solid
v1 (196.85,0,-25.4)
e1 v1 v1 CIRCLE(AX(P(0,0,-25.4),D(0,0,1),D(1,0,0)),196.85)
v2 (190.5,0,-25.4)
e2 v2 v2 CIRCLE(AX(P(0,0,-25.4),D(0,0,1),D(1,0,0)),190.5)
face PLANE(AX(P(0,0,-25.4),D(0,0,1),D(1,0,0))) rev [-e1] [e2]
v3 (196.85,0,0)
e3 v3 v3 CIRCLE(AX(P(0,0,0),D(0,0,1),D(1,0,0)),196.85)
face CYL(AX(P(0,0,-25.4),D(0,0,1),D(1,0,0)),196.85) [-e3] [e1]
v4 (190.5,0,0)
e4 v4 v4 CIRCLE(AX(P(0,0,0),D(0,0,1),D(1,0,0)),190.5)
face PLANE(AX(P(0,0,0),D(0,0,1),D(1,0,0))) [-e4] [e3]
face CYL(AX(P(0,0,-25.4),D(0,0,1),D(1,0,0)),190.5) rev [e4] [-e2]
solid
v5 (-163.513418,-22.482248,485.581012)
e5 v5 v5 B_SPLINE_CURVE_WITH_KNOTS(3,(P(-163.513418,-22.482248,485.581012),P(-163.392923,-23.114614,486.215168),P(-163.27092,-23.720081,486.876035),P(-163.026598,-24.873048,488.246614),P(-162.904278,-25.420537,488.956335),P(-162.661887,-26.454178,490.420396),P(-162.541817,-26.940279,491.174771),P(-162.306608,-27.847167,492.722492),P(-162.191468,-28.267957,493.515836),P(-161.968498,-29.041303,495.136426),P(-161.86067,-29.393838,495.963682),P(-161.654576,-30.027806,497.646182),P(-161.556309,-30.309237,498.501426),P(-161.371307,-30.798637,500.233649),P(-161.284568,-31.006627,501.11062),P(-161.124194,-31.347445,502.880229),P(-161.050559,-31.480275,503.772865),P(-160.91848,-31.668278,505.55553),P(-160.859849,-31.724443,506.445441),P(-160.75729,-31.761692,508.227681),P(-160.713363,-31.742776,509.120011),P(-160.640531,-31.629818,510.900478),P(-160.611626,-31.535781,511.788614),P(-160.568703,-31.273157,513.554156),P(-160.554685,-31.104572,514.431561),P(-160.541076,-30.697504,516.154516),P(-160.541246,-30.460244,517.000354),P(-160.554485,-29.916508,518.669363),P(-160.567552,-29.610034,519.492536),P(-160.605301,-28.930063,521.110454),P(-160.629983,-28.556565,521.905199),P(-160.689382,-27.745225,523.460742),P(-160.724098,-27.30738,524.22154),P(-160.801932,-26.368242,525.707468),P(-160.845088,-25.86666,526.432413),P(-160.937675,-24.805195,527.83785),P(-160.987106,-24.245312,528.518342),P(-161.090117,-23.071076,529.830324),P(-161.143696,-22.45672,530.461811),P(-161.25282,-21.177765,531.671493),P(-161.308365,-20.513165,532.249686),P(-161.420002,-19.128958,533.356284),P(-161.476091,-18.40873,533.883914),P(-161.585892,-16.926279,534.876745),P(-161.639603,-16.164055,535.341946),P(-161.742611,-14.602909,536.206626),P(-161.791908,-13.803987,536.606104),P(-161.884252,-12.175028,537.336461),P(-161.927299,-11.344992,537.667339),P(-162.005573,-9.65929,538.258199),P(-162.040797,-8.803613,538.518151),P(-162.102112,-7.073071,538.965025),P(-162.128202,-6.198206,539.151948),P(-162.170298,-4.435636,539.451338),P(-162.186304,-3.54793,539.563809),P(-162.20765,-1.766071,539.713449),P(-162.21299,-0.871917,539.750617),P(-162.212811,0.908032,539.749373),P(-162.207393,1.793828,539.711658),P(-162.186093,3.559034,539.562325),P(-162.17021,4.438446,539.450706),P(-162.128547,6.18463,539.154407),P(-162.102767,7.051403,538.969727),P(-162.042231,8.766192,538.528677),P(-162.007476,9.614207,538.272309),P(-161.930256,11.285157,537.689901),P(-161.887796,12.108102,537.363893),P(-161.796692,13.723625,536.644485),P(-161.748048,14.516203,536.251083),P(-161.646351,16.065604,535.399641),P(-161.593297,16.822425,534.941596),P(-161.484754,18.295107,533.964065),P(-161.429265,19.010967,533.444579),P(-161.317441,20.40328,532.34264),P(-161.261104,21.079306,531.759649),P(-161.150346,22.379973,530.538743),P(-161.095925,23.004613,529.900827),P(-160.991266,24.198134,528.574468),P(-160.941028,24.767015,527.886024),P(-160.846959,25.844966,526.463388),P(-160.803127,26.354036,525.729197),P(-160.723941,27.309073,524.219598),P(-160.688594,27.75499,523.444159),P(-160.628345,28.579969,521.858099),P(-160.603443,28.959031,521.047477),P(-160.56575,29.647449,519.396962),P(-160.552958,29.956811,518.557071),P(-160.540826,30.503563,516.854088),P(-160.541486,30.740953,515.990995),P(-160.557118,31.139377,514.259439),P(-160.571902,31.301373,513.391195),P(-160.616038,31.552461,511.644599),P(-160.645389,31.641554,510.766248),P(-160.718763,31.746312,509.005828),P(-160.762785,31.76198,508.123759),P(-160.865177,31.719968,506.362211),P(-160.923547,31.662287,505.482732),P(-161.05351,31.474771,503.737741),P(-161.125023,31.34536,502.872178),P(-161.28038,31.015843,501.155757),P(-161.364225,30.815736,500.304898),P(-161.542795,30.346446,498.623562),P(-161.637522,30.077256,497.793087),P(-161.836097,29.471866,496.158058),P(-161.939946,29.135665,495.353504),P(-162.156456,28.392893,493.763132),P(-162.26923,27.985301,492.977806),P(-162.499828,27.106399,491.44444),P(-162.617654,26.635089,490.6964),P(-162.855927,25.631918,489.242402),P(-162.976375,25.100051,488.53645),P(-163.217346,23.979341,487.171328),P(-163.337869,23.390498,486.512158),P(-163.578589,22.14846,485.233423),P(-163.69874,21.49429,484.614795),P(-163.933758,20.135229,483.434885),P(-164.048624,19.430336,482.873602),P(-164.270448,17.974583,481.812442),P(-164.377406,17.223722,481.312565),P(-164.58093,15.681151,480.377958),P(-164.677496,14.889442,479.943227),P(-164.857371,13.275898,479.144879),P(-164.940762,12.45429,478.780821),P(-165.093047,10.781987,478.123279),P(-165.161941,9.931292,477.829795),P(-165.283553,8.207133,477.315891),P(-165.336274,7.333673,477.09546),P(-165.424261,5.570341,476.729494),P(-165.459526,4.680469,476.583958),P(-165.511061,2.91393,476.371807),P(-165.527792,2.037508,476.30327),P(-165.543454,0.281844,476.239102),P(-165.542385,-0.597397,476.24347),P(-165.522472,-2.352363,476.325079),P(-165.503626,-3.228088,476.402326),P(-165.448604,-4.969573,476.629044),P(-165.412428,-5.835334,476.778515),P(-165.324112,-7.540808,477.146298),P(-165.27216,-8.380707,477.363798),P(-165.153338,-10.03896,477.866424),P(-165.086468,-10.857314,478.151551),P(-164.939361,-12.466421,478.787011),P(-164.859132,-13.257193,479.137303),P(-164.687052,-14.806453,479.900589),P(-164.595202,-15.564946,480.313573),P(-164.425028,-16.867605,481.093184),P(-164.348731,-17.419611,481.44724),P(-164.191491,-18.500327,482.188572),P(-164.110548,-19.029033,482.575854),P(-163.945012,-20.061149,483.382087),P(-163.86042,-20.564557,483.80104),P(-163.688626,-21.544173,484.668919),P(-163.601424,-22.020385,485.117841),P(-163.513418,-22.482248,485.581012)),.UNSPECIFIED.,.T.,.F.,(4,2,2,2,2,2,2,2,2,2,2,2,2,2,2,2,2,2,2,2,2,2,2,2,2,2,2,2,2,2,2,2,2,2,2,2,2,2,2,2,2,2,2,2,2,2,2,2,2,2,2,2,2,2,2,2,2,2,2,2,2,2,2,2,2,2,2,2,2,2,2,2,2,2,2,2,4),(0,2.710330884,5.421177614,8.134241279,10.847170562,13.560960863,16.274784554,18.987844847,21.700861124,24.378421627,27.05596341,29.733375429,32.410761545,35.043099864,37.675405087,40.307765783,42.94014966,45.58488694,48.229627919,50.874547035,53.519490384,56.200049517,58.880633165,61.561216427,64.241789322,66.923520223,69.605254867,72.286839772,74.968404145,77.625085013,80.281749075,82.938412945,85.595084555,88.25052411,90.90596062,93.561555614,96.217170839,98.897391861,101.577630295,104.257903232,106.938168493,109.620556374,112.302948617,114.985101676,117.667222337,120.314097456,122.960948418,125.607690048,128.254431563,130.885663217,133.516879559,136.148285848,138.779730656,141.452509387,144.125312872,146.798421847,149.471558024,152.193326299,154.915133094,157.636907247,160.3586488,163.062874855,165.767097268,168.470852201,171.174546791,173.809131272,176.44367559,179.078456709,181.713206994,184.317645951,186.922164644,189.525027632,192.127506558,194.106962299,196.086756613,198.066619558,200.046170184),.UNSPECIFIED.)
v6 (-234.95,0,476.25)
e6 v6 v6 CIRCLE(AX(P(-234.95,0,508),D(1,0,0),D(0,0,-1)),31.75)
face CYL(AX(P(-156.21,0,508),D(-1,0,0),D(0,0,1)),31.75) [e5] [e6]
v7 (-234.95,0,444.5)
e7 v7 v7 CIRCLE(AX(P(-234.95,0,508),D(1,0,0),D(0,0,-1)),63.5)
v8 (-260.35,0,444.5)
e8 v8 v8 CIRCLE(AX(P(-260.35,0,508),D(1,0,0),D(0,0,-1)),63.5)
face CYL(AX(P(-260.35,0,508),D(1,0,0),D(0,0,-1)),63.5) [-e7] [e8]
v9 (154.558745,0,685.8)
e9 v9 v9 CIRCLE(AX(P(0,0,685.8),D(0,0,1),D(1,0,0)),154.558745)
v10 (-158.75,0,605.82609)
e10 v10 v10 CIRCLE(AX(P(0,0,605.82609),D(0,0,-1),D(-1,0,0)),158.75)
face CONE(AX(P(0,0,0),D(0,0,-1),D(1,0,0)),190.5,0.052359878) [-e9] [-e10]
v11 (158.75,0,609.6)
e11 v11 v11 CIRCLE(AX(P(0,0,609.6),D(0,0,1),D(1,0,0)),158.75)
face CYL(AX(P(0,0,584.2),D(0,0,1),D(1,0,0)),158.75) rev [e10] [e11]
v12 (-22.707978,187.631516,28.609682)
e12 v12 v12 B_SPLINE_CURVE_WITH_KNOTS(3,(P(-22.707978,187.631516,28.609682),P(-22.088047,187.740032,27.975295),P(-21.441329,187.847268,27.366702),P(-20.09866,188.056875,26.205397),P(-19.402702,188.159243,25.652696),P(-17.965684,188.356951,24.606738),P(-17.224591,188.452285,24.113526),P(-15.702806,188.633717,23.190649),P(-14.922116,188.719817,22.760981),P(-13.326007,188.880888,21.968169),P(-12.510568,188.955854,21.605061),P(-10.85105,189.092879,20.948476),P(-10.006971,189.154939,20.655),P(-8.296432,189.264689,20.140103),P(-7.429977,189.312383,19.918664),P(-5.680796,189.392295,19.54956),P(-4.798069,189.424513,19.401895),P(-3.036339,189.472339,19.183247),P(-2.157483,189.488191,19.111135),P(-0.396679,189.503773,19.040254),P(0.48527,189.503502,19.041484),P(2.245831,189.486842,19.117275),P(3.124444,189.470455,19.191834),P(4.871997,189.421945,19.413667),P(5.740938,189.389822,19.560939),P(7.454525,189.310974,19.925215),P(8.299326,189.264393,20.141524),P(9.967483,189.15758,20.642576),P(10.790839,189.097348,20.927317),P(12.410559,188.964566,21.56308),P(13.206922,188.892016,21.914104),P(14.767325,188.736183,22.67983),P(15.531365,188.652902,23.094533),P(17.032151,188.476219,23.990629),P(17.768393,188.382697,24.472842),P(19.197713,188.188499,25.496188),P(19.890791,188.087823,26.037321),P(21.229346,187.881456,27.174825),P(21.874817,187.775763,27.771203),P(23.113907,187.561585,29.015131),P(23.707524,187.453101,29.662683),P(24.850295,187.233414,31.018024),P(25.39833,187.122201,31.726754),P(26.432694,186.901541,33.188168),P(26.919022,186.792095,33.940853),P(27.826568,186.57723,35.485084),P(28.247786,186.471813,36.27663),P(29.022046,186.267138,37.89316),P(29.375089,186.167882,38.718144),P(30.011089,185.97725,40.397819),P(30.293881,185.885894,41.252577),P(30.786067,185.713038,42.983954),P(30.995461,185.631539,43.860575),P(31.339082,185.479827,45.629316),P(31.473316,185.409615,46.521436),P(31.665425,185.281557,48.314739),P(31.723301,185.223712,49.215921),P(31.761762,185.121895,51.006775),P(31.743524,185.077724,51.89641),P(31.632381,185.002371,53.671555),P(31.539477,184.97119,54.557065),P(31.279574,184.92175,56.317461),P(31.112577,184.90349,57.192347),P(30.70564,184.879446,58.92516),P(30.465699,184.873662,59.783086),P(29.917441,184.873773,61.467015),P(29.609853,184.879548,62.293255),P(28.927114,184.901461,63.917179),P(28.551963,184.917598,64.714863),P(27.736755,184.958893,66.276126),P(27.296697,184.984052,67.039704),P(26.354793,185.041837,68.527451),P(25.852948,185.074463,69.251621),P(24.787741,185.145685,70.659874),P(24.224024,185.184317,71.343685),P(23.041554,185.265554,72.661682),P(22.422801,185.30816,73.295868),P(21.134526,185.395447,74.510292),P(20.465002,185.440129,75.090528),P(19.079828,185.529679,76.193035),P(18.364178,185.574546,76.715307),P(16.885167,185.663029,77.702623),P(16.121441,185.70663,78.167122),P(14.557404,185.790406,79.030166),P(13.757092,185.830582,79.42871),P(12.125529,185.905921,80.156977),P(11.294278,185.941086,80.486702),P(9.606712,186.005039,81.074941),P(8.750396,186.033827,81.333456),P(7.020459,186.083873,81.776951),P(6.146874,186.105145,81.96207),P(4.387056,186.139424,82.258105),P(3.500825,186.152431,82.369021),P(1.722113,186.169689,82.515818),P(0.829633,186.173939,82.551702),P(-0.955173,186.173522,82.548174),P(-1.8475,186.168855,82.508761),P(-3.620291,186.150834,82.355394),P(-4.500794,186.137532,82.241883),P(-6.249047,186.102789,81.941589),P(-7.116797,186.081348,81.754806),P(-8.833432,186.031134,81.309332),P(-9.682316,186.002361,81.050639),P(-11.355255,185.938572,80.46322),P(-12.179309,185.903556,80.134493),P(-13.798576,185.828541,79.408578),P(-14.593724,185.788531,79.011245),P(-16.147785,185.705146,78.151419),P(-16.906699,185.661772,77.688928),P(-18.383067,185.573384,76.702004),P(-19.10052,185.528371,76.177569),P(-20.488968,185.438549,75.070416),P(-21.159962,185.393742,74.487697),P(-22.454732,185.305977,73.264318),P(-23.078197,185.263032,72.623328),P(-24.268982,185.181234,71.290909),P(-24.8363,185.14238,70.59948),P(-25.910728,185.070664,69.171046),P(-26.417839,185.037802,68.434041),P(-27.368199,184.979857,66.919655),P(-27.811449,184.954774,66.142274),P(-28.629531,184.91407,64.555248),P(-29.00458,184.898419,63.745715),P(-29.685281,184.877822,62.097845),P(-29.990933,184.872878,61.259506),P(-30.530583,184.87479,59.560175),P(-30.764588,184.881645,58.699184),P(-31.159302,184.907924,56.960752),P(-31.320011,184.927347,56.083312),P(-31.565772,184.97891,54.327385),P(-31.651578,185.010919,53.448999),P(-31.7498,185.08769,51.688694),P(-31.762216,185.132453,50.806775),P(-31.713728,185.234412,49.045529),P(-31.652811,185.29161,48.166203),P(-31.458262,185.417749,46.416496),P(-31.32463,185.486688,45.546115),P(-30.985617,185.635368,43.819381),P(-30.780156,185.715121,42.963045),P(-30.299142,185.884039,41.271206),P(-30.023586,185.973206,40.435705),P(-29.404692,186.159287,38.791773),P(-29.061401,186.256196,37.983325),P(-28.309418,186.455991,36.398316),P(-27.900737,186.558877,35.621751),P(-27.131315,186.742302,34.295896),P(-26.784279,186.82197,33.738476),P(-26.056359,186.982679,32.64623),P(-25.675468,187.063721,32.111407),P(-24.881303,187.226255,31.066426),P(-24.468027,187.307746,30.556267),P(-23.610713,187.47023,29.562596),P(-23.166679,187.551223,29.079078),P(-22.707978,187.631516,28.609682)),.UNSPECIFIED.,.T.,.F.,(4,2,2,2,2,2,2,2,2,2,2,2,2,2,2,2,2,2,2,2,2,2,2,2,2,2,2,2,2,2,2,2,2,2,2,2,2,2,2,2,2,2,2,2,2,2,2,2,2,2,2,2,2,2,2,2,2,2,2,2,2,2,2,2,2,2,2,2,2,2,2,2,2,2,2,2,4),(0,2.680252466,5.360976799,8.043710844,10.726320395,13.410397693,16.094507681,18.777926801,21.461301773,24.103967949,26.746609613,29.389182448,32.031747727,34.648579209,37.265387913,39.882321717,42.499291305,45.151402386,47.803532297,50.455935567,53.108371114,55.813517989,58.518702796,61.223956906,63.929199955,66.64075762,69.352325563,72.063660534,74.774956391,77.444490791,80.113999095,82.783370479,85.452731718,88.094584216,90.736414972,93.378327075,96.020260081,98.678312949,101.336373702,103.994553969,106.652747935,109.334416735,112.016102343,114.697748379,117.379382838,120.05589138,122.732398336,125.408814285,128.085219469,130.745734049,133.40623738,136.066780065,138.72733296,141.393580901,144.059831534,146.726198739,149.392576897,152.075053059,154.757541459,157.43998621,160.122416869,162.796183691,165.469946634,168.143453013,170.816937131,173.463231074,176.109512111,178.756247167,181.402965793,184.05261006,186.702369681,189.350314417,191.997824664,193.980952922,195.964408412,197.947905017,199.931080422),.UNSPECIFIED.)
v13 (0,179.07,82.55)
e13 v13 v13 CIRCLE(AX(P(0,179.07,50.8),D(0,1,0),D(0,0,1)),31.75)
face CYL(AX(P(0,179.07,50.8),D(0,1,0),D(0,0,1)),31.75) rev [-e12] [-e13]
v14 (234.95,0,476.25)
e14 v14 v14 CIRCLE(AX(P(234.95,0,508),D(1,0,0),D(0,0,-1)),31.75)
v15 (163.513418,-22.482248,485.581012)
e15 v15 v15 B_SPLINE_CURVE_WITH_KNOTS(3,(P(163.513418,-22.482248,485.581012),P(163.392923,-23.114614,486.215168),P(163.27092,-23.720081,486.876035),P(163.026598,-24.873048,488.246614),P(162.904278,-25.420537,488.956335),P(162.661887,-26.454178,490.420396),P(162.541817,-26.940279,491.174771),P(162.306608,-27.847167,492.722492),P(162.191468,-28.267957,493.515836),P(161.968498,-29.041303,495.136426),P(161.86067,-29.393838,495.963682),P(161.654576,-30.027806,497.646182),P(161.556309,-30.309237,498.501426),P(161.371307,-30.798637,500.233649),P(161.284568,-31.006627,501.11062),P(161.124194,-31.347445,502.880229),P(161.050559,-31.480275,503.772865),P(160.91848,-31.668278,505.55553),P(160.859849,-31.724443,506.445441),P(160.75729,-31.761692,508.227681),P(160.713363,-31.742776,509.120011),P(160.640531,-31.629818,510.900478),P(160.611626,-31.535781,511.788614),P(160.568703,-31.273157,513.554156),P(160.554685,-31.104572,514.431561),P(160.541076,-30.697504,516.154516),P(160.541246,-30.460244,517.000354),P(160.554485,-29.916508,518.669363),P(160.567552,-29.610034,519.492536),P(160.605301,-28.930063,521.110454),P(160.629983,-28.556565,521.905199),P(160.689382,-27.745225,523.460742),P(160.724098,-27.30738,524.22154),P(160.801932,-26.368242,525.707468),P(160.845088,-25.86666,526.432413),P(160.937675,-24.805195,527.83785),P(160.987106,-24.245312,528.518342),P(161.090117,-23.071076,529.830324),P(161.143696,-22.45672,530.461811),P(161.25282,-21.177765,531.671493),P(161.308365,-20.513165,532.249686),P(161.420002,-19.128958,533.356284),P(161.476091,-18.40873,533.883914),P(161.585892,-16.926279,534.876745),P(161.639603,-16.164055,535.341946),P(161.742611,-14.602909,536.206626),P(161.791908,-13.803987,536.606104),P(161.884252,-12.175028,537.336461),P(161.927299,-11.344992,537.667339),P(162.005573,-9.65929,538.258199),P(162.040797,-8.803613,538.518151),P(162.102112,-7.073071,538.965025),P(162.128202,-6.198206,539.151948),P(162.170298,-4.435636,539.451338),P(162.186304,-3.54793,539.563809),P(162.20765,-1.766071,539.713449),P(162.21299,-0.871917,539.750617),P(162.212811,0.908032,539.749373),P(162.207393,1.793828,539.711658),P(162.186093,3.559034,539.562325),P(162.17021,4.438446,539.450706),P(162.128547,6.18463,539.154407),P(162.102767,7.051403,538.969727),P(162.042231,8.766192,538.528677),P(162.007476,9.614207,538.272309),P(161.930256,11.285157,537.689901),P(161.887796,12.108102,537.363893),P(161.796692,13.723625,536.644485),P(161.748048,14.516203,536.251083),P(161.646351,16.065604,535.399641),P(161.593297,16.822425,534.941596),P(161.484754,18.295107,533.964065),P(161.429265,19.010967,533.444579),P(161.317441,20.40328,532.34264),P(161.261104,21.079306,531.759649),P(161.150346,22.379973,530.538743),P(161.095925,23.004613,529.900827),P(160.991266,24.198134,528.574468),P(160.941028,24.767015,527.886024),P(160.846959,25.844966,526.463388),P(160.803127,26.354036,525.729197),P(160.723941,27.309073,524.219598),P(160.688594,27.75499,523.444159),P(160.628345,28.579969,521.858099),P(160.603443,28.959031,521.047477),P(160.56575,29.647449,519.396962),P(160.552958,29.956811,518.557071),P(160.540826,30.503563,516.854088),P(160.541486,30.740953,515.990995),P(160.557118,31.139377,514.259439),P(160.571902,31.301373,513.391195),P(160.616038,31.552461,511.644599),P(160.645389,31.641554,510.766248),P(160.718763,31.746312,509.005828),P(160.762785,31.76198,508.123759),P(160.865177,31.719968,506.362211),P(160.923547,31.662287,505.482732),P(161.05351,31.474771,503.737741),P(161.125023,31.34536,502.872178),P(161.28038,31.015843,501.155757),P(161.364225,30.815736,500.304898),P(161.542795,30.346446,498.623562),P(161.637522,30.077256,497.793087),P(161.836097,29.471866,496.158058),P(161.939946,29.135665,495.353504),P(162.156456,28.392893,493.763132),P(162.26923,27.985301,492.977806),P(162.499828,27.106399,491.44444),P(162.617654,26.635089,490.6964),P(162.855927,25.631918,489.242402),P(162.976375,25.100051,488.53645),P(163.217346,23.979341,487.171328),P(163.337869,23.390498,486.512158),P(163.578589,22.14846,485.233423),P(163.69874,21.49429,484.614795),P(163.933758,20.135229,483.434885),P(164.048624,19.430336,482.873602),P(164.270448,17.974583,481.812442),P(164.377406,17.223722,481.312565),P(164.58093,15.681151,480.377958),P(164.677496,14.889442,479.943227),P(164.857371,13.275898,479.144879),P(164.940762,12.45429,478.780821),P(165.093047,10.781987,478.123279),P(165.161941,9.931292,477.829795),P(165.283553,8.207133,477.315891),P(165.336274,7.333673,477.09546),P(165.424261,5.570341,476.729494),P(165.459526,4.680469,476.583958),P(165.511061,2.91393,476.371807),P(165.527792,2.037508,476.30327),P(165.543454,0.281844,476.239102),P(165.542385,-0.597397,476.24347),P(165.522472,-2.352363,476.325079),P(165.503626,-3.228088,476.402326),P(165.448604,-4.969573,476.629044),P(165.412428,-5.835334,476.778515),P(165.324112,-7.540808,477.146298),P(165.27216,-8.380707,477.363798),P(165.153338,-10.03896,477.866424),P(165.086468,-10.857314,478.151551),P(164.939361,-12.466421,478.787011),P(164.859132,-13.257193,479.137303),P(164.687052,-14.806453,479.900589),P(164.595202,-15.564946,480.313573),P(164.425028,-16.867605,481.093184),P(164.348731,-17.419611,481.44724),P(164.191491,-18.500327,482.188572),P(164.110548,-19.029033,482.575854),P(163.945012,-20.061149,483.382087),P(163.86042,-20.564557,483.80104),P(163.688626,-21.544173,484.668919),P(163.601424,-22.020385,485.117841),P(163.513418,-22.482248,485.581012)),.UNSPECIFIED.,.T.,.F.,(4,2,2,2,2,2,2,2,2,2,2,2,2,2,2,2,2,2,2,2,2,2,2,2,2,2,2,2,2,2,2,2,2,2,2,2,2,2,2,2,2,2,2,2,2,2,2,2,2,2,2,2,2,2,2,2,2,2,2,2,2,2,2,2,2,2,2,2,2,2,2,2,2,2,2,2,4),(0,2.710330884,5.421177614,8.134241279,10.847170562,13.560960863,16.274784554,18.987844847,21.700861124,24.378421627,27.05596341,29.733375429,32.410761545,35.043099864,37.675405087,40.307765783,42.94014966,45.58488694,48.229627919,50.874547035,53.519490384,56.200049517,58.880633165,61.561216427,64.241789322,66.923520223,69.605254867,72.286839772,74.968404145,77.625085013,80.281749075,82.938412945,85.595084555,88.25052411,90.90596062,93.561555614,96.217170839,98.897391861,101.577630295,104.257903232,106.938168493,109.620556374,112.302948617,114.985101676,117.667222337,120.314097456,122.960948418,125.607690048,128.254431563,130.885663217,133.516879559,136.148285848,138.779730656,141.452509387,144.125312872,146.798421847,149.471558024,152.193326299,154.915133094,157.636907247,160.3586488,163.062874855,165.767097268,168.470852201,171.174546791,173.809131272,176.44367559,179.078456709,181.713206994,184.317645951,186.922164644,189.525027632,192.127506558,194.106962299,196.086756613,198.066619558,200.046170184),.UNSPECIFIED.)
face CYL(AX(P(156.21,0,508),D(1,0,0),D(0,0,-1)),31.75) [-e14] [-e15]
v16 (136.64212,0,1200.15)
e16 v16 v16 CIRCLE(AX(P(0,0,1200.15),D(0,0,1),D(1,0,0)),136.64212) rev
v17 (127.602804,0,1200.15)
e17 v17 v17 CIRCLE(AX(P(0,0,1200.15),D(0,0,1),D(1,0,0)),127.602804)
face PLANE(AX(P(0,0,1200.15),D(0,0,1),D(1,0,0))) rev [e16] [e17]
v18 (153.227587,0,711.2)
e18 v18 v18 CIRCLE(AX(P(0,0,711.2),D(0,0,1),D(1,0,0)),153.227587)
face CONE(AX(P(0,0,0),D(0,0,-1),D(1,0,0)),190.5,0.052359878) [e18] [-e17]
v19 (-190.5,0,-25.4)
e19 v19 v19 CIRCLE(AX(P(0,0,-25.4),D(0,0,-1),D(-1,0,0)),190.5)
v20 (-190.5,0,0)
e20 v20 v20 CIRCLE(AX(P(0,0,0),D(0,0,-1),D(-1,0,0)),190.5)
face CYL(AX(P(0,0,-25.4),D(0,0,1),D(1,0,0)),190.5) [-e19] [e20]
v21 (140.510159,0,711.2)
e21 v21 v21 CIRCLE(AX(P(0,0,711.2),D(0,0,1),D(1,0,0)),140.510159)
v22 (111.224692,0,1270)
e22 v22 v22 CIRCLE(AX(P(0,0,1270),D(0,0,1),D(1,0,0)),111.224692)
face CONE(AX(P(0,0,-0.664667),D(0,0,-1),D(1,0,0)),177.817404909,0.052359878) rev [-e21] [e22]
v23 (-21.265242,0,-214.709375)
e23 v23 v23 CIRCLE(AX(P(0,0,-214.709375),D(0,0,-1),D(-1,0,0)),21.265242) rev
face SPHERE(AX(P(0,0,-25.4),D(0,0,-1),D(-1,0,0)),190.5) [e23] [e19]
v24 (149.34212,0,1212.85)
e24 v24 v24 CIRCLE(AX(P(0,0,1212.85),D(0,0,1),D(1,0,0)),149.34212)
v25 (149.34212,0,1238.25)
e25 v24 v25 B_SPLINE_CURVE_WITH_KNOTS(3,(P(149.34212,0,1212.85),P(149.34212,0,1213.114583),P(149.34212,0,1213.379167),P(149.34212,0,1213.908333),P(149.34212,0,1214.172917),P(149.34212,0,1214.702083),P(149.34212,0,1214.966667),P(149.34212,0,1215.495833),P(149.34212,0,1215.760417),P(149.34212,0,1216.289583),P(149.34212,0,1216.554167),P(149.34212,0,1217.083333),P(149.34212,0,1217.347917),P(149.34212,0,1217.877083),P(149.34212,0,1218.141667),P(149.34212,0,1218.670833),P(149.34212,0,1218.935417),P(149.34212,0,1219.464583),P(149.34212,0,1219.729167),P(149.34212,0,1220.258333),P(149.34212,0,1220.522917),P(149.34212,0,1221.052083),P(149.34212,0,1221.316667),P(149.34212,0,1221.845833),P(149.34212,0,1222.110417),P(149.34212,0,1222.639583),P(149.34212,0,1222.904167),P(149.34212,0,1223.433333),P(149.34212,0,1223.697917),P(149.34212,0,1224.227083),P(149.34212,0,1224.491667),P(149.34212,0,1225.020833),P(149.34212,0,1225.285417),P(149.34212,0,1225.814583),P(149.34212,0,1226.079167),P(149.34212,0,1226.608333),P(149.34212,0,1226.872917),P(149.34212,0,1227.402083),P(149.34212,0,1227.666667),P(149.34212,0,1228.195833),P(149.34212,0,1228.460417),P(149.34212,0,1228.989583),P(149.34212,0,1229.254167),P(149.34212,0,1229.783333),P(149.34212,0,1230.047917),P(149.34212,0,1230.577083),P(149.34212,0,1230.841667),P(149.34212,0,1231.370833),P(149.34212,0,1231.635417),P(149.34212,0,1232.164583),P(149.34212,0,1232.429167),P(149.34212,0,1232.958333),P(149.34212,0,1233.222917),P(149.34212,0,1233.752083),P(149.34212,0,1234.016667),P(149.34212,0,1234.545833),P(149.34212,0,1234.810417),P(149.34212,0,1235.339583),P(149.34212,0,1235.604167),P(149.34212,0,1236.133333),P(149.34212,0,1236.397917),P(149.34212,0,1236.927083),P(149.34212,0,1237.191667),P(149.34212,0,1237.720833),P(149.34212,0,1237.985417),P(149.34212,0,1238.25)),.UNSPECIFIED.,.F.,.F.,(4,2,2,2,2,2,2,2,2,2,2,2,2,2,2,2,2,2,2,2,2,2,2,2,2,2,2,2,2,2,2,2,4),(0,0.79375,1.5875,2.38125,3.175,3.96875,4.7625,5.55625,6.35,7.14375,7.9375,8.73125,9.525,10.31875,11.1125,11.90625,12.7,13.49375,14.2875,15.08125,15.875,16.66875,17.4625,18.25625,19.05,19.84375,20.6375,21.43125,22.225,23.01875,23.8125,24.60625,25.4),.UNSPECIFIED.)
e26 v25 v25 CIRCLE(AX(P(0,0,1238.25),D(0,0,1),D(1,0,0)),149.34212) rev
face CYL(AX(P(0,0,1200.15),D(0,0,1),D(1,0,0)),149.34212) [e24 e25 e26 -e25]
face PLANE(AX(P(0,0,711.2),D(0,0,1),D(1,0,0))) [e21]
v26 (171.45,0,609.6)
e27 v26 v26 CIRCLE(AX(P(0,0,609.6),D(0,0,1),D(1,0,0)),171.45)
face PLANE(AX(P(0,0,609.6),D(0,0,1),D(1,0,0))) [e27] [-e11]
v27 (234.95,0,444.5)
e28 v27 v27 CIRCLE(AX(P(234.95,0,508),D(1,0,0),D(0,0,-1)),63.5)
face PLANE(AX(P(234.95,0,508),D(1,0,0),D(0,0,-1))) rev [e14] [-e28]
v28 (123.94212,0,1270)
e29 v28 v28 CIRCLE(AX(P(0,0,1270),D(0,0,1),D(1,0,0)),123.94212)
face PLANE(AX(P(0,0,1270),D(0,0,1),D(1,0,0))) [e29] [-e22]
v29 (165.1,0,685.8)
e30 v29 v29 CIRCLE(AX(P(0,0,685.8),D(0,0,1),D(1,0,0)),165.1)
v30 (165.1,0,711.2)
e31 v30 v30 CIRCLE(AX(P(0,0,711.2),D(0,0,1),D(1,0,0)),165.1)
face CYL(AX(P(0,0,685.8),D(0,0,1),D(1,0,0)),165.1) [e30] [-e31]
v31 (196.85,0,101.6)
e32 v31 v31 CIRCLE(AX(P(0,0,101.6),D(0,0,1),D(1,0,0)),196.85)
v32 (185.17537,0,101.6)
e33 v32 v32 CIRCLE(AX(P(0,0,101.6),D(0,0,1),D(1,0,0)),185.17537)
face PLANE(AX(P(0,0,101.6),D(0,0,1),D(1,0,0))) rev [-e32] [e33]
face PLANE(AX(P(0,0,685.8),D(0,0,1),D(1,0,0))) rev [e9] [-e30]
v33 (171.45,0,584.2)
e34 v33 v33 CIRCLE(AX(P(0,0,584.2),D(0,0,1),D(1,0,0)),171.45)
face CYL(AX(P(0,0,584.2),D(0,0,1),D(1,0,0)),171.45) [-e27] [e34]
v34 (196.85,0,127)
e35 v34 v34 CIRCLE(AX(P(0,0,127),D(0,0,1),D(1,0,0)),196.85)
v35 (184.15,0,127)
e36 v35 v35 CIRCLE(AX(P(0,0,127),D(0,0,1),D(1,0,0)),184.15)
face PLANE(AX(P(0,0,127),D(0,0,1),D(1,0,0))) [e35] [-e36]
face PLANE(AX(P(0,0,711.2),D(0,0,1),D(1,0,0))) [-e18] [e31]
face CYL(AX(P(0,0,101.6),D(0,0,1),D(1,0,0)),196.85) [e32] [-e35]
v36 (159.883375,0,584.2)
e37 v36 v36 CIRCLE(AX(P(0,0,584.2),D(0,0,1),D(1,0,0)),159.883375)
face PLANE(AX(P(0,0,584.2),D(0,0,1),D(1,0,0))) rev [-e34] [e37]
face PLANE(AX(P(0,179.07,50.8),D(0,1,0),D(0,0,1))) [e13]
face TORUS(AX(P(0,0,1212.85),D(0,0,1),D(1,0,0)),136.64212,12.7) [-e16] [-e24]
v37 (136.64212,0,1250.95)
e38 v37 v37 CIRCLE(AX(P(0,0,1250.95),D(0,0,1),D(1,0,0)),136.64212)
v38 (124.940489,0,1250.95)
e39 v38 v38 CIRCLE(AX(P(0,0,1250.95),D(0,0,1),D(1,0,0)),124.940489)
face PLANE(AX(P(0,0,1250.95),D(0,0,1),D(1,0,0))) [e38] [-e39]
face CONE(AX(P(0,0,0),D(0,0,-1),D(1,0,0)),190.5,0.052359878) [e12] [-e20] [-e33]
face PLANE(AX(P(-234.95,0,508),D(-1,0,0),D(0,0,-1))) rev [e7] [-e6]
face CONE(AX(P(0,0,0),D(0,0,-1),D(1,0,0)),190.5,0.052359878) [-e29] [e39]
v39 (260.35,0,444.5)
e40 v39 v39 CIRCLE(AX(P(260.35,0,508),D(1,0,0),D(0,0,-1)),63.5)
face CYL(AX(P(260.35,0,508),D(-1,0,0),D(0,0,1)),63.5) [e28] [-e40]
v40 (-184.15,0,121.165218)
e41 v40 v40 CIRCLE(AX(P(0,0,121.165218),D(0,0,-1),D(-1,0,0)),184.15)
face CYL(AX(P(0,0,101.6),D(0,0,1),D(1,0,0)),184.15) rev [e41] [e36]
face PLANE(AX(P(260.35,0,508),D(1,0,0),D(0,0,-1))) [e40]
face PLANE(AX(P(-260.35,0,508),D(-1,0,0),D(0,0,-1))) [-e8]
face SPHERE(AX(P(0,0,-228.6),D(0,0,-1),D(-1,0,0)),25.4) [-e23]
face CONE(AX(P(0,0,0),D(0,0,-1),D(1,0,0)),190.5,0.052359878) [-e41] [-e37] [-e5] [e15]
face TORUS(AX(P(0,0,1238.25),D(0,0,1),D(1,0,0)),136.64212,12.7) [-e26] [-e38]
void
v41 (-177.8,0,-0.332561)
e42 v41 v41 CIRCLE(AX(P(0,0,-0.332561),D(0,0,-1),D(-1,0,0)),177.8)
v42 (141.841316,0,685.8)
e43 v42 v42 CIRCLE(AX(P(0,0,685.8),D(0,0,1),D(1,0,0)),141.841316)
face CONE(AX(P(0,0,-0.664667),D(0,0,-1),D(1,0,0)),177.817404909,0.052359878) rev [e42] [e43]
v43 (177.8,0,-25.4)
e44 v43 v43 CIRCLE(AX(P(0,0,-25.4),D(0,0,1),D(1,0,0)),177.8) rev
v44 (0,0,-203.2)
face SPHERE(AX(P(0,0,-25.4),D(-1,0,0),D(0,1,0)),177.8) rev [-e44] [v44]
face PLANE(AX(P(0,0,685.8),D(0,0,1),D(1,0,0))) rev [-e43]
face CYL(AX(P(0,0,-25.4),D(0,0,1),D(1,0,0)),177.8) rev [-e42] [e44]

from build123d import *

# Parameters (mm, degrees)
SKETCH1_R           = 190.5
BOSS_EXTRUDE1_DEPTH = 1270
BOSS_EXTRUDE1_TAPER = 3
SKETCH5_R           = 190.5
BOSS_EXTRUDE3_DEPTH = 25.4
REVOLVE1_ANGLE      = 180
SKETCH4_R           = 196.85
SKETCH4_R_2         = 190.5
BOSS_EXTRUDE2_DEPTH = 25.4
SKETCH8_R           = 149.342120311
SKETCH8_R_2         = 123.942120311
BOSS_EXTRUDE4_DEPTH = 50.8
FILLET1_R           = 12.7
SKETCH10_R          = 196.85
SKETCH10_R_2        = 184.15
BOSS_EXTRUDE5_DEPTH = 25.4
SKETCH11_R          = 31.75
CUT_EXTRUDE1_DEPTH  = 19.05
SKETCH12_R          = 165.1
BOSS_EXTRUDE6_DEPTH = 25.4
SKETCH13_R          = 171.45
SKETCH13_R_2        = 158.75
BOSS_EXTRUDE7_DEPTH = 25.4
BOSS_EXTRUDE8_START = -15.24
SKETCH15_R          = 31.75
BOSS_EXTRUDE8_DEPTH = 78.74
SKETCH16_R          = 63.5
BOSS_EXTRUDE9_DEPTH = 25.4


# Read off the part's stored shape, not the designer's step: Shell1
with BuildPart() as part:
    # Sketch1 → Boss-Extrude1 (new body)
    with BuildSketch(Plane.XY):
        Circle(SKETCH1_R)
    extrude(amount=BOSS_EXTRUDE1_DEPTH, taper=BOSS_EXTRUDE1_TAPER)

    # Sketch5 → Boss-Extrude3 (add)
    with BuildSketch(Plane(origin=(0, 0, 0), x_dir=(-1, 0, 0), z_dir=(0, 0, -1))):
        Circle(SKETCH5_R)
    extrude(amount=BOSS_EXTRUDE3_DEPTH)

    # Sketch2 → Revolve1 (revolve)
    with BuildSketch(Plane(origin=(0, 0, -25.4), x_dir=(-1, 0, 0), z_dir=(0, 0, -1))):
        with BuildLine():
            Line((-190.5, 0), (190.5, 0))
            ThreePointArc((190.5, 0), (0, -190.5), (-190.5, 0))
        make_face()
    revolve(axis=Axis((249.150886089, 0, -25.4), (1, 0, 0)), revolution_arc=REVOLVE1_ANGLE)

    # Shell1 outline → Shell1 (revolve, cut)
    with BuildSketch(Plane.XZ):
        with BuildLine():
            ThreePointArc((0, -203.2), (125.723585707, -151.123585683), (177.8, -25.399999967))
            Line((177.8, -25.399999967), (177.8, -0.332561204))
            Line((177.8, -0.332561204), (111.224691516, 1270))
            Line((111.224691516, 1270), (0, 1270))
            Line((0, 1270), (0, -203.2))
        make_face()
    revolve(axis=Axis((0, 0, 0), (0, 0, 1)), mode=Mode.SUBTRACT)

    # Sketch3 → Revolve2 (revolve)
    with BuildSketch(Plane.XY.offset(-228.6)):
        with BuildLine():
            Line((25.4, 0), (-25.4, 0))
            ThreePointArc((-25.4, 0), (0, -25.4), (25.4, 0))
        make_face()
    revolve(axis=Axis((190.5, 0, -228.6), (-1, 0, 0)))

    # Sketch8 → Boss-Extrude4 (add)
    with BuildSketch(Plane.XY.offset(1250.95)):
        Circle(SKETCH8_R)
        Circle(SKETCH8_R_2, mode=Mode.SUBTRACT)
    extrude(amount=-BOSS_EXTRUDE4_DEPTH)

    # Fillet1
    fillet1_edges = [part.edges().sort_by_distance(p)[0] for p in [
        (-149.342120311, 0, 1200.15),
        (-149.342120311, 0, 1250.95),
    ]]
    fillet(fillet1_edges, radius=FILLET1_R)

    # Sketch10 → Boss-Extrude5 (add)
    with BuildSketch(Plane.XY.offset(127)):
        Circle(SKETCH10_R)
        Circle(SKETCH10_R_2, mode=Mode.SUBTRACT)
    extrude(amount=-BOSS_EXTRUDE5_DEPTH)

    # Sketch11 → Cut-Extrude1 (cut)
    with BuildSketch(Plane(origin=(0, 198.12, 0), x_dir=(1, 0, 0), z_dir=(0, 1, 0))):
        with Locations(Location((0, -50.8, 0), (0, 0, 270))):
            Circle(SKETCH11_R)
    extrude(amount=-CUT_EXTRUDE1_DEPTH, mode=Mode.SUBTRACT)

    # Sketch12 → Boss-Extrude6 (add)
    with BuildSketch(Plane.XY.offset(711.2)):
        Circle(SKETCH12_R)
    extrude(amount=-BOSS_EXTRUDE6_DEPTH)

    # Sketch13 → Boss-Extrude7 (add)
    with BuildSketch(Plane.XY.offset(609.6)):
        Circle(SKETCH13_R)
        Circle(SKETCH13_R_2, mode=Mode.SUBTRACT)
    extrude(amount=-BOSS_EXTRUDE7_DEPTH)

    # Sketch15 → Boss-Extrude8 (add)
    with BuildSketch(Plane(origin=(171.45, 0, 0), x_dir=(0, 0, -1), z_dir=(1, 0, 0)).offset(BOSS_EXTRUDE8_START)):
        with Locations((-508, 0)):
            Circle(SKETCH15_R)
    boss_extrude8 = extrude(amount=BOSS_EXTRUDE8_DEPTH)

    # Sketch16 → Boss-Extrude9 (add)
    with BuildSketch(Plane(origin=(234.95, 0, 0), x_dir=(0, 0, -1), z_dir=(1, 0, 0))):
        with Locations((-508, 0)):
            Circle(SKETCH16_R)
    boss_extrude9 = extrude(amount=BOSS_EXTRUDE9_DEPTH)

    # Mirror1: Boss-Extrude8, Boss-Extrude9 across plane
    add(boss_extrude8.mirror(Plane(origin=(0, 0, 0), x_dir=(0, 0, 1), z_dir=(1, 0, 0))))
    add(boss_extrude9.mirror(Plane(origin=(0, 0, 0), x_dir=(0, 0, 1), z_dir=(1, 0, 0))))


with BuildPart() as body_2:
    # Sketch4 → Boss-Extrude2 (new body)
    with BuildSketch(Plane.XY):
        Circle(SKETCH4_R)
        Circle(SKETCH4_R_2, mode=Mode.SUBTRACT)
    extrude(amount=-BOSS_EXTRUDE2_DEPTH)


solid = Compound([part.part, body_2.part])
